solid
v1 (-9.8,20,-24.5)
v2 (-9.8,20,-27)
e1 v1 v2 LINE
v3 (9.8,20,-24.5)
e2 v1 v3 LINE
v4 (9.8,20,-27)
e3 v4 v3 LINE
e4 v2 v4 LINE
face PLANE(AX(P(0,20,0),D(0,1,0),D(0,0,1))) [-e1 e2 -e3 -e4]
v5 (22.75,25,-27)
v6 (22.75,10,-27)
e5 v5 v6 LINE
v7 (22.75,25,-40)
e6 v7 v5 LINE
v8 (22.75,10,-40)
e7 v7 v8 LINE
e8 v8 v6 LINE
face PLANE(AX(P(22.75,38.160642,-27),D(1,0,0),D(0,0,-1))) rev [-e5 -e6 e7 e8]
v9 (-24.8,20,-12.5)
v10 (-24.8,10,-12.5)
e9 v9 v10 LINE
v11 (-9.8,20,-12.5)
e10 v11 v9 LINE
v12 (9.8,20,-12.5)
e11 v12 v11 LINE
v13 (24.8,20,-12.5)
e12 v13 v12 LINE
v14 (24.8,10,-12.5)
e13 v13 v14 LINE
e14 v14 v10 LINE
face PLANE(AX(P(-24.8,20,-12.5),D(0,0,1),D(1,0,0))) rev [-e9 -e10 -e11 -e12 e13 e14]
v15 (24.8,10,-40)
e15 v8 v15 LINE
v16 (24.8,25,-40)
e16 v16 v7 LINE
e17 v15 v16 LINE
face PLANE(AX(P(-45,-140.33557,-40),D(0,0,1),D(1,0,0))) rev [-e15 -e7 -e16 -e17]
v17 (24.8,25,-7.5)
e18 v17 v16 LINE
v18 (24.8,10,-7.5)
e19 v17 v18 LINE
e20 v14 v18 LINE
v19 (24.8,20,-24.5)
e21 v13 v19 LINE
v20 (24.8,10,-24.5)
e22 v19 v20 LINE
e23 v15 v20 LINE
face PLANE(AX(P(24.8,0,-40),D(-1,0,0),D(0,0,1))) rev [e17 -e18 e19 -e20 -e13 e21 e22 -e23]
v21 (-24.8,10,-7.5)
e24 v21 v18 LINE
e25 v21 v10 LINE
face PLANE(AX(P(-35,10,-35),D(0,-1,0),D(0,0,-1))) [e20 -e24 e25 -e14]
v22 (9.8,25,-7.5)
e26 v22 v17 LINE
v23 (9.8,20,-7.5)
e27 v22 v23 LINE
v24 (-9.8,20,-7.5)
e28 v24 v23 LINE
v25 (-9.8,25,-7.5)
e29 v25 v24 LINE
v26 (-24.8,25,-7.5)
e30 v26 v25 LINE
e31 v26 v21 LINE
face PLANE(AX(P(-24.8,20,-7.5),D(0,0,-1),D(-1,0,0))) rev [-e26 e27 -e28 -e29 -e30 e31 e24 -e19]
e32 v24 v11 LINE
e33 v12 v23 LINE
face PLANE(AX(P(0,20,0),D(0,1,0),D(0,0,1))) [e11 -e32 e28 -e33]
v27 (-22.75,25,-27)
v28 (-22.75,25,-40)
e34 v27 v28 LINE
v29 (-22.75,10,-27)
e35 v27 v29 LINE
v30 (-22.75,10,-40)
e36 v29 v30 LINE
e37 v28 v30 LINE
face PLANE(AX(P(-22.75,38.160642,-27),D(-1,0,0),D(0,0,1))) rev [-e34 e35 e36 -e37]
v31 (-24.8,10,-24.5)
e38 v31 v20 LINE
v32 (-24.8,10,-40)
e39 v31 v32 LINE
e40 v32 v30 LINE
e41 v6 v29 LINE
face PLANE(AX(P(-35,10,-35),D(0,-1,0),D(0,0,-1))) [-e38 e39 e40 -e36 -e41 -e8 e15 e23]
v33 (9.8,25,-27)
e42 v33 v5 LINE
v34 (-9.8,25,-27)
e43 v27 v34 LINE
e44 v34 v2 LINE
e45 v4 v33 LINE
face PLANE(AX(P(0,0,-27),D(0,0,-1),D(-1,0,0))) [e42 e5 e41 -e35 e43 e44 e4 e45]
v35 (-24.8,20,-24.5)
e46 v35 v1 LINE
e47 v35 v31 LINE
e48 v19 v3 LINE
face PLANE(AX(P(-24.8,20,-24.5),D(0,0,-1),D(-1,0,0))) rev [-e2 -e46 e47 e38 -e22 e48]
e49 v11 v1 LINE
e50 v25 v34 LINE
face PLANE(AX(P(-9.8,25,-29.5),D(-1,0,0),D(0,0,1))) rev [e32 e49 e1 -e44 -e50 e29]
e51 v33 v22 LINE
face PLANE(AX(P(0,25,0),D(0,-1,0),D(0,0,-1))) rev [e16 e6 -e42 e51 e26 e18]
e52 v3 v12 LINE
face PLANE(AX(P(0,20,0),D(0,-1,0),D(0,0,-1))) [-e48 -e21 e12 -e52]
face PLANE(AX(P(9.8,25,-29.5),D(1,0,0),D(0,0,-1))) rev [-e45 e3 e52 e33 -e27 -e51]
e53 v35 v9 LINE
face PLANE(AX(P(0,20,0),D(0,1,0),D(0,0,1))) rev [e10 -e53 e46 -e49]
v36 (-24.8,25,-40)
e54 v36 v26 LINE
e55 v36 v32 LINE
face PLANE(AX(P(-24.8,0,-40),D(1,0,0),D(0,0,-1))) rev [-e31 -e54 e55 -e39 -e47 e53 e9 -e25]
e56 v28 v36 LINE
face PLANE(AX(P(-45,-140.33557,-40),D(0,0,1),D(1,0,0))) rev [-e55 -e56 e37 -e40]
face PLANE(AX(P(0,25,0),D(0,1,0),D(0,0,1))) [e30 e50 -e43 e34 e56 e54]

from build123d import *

# Parameters (mm, degrees)
BOSS_EXTRUDE1_DEPTH     = 10
SKETCH2_W               = 17.2
SKETCH2_H               = 43
CUT_EXTRUDE1_DEPTH      = 72.414284285
SKETCH3_W               = 90
SKETCH3_H               = 34
SKETCH3_W_2             = 80
SKETCH3_H_2             = 24
BOSS_EXTRUDE3_DEPTH     = 15
SKETCH4_W               = 49.6
SKETCH4_H               = 5
BOSS_EXTRUDE4_DEPTH     = 10
SKETCH5_W               = 15
SKETCH5_H               = 22
BOSS_EXTRUDE5_DEPTH     = 5
SKETCH6_W               = 90
SKETCH6_H               = 77
BOSS_EXTRUDE6_DEPTH     = 15
BOSS_EXTRUDE8_DEPTH     = 39
CHAMFER1_SIZE           = 64
CHAMFER1_SIZE_2         = 3.354097874
CHAMFER2_SIZE           = 64
CHAMFER2_SIZE_2         = 11.405813635
CHAMFER3_SIZE           = 64
CHAMFER3_SIZE_2         = 13.775745352
CUT_EXTRUDE3_DEPTH      = 95.500525601
CUT_EXTRUDE3_DEPTH_BACK = 95.500525601
SKETCH10_W              = 50
SKETCH10_H              = 27
SKETCH15_R              = 8
CUT_EXTRUDE5_DEPTH      = 122.227059686
CUT_EXTRUDE6_DEPTH      = 2.5
SKETCH18_W              = 29.6
SKETCH18_H              = 43
CUT_EXTRUDE7_DEPTH      = 10
CUT_EXTRUDE8_DEPTH      = 15
SKETCH21_W              = 29.6
SKETCH21_H              = 33
BOSS_EXTRUDE10_DEPTH    = 2.5
SKETCH23_W              = 2.05
SKETCH23_H              = 13
BOSS_EXTRUDE11_DEPTH    = 15
SKETCH24_OUTSIDE_W      = 133.046
SKETCH24_OUTSIDE_H      = 133.046
SKETCH24_OUTSIDE_W_2    = 90
SKETCH24_OUTSIDE_H_2    = 72
CUT_EXTRUDE10_DEPTH     = 61.5
SKETCH26_W              = 100
SKETCH26_H              = 100
CUT_EXTRUDE13_DEPTH     = 10


with BuildPart() as part:
    # Sketch1 → Boss-Extrude1 (new body)
    with BuildSketch(Plane(origin=(0, 0, 0), x_dir=(1, 0, 0), z_dir=(0, 1, 0))):
        with BuildLine():
            Line((-35, 50), (35, 50))
            ThreePointArc((35, 50), (45.606601718, 45.606601718), (50, 35))
            Line((50, 35), (50, -35))
            ThreePointArc((50, -35), (45.606601718, -45.606601718), (35, -50))
            Line((35, -50), (-35, -50))
            ThreePointArc((-35, -50), (-45.606601718, -45.606601718), (-50, -35))
            Line((-50, -35), (-50, 35))
            ThreePointArc((-50, 35), (-45.606601718, 45.606601718), (-35, 50))
        make_face()
    extrude(amount=BOSS_EXTRUDE1_DEPTH)

    # Sketch2 → Cut-Extrude1 (cut, through all)
    with BuildSketch(Plane(origin=(0, 10, 0), x_dir=(1, 0, 0), z_dir=(0, 1, 0))):
        with Locations((-33.4, 18.5)):
            Rectangle(SKETCH2_W, SKETCH2_H)
        with Locations((33.4, 18.5)):
            Rectangle(SKETCH2_W, SKETCH2_H)
    extrude(amount=-CUT_EXTRUDE1_DEPTH, mode=Mode.SUBTRACT)

    # Sketch3 → Boss-Extrude3 (add)
    with BuildSketch(Plane(origin=(0, 10, 0), x_dir=(1, 0, 0), z_dir=(0, 1, 0))):
        with Locations((0, -20)):
            Rectangle(SKETCH3_W, SKETCH3_H)
        with Locations((0, -20)):
            Rectangle(SKETCH3_W_2, SKETCH3_H_2, mode=Mode.SUBTRACT)
    extrude(amount=BOSS_EXTRUDE3_DEPTH)

    # Sketch4 → Boss-Extrude4 (add)
    with BuildSketch(Plane(origin=(0, 10, 0), x_dir=(1, 0, 0), z_dir=(0, 1, 0))):
        with Locations((0, 10)):
            Rectangle(SKETCH4_W, SKETCH4_H)
        with Locations((0, 27)):
            Rectangle(SKETCH4_W, SKETCH4_H)
    extrude(amount=BOSS_EXTRUDE4_DEPTH)

    # Sketch5 → Boss-Extrude5 (add)
    with BuildSketch(Plane(origin=(0, 20, 0), x_dir=(1, 0, 0), z_dir=(0, 1, 0))):
        with Locations((-17.3, 18.5)):
            Rectangle(SKETCH5_W, SKETCH5_H)
        with Locations((17.3, 18.5)):
            Rectangle(SKETCH5_W, SKETCH5_H)
    extrude(amount=BOSS_EXTRUDE5_DEPTH)

    # Sketch6 → Boss-Extrude6 (add)
    with BuildSketch(Plane(origin=(0, 10, 0), x_dir=(1, 0, 0), z_dir=(0, 1, 0))):
        with BuildLine():
            Line((-50, 35), (-50, -35))
            ThreePointArc((-50, -35), (-45.606601718, -45.606601718), (-35, -50))
            Line((-35, -50), (35, -50))
            ThreePointArc((35, -50), (45.606601718, -45.606601718), (50, -35))
            Line((50, -35), (50, 35))
            ThreePointArc((50, 35), (45.606601718, 45.606601718), (35, 50))
            Line((35, 50), (-35, 50))
            ThreePointArc((-35, 50), (-45.606601718, 45.606601718), (-50, 35))
        make_face()
        with Locations((0, 1.5)):
            Rectangle(SKETCH6_W, SKETCH6_H, mode=Mode.SUBTRACT)
    extrude(amount=BOSS_EXTRUDE6_DEPTH)

    # Sketch9 → Boss-Extrude8 (add)
    with BuildSketch(Plane(origin=(0, 25, 0), x_dir=(1, 0, 0), z_dir=(0, 1, 0))):
        with BuildLine():
            Line((-50, 35), (-50, -35))
            ThreePointArc((-50, -35), (-45.606601718, -45.606601718), (-35, -50))
            Line((-35, -50), (35, -50))
            ThreePointArc((35, -50), (45.606601718, -45.606601718), (50, -35))
            Line((50, -35), (50, 35))
            ThreePointArc((50, 35), (45.606601718, 45.606601718), (35, 50))
            Line((35, 50), (-35, 50))
            ThreePointArc((-35, 50), (-45.606601718, 45.606601718), (-50, 35))
        make_face()
        with BuildLine():
            Line((-45, 35), (-45, -32))
            Line((-45, -32), (45, -32))
            Line((45, -32), (45, 35))
            ThreePointArc((45, 35), (44.659258263, 37.588190451), (43.660254038, 40))
            Line((43.660254038, 40), (-43.660254038, 40))
            ThreePointArc((-43.660254038, 40), (-44.659258263, 37.588190451), (-45, 35))
        make_face(mode=Mode.SUBTRACT)
    extrude(amount=BOSS_EXTRUDE8_DEPTH)

    # Chamfer1
    # the kernel refuses this chamfer: 64, 3.354097874 mm, written as the material it takes off along each edge
    with BuildSketch(Plane(origin=(-35, 64, 50), x_dir=(0, -0.9999979738662979, 0.002013023422382214), z_dir=(1, 0, 0)), Plane(origin=(50, 64, 35), x_dir=(0.002013023422382214, -0.9999979738662979, 0), z_dir=(0, 0, -1)), Plane(origin=(-50, 64, -35), x_dir=(-0.002013023422382214, -0.9999979738662979, 0), z_dir=(0, 0, 1)), Plane(origin=(35, 64, -50), x_dir=(0, -0.9999979738662979, -0.002013023422382214), z_dir=(-1, 0, 0))) as chamfer1_piece_1:
        Polygon((CHAMFER1_SIZE * 0.999997973866, CHAMFER1_SIZE * 0.00201302342238), (-CHAMFER1_SIZE_2 * 0.00201302342245, CHAMFER1_SIZE_2 * 0.9999979739), (0, 0), align=None)
    extrude(amount=70, mode=Mode.SUBTRACT)
    with BuildSketch(Plane(origin=(35, 64, 35), x_dir=(0, 0, 1), z_dir=(-1, 0, 0))) as chamfer1_piece_2:
        Polygon((15, -CHAMFER1_SIZE), (15 - CHAMFER1_SIZE_2, 0), (15, 0), align=None)
    revolve(axis=Axis((35, 64, 35), (0, 1, 0)), revolution_arc=90, mode=Mode.SUBTRACT)
    with BuildSketch(Plane(origin=(-35, 64, 35), x_dir=(-1, 0, 0), z_dir=(0, 0, -1))) as chamfer1_piece_3:
        Polygon((15, -CHAMFER1_SIZE), (15 - CHAMFER1_SIZE_2, 0), (15, 0), align=None)
    revolve(axis=Axis((-35, 64, 35), (0, 1, 0)), revolution_arc=90, mode=Mode.SUBTRACT)
    with BuildSketch(Plane(origin=(35, 64, -35), x_dir=(1, 0, 0), z_dir=(0, 0, 1))) as chamfer1_piece_4:
        Polygon((15, -CHAMFER1_SIZE), (15 - CHAMFER1_SIZE_2, 0), (15, 0), align=None)
    revolve(axis=Axis((35, 64, -35), (0, 1, 0)), revolution_arc=90, mode=Mode.SUBTRACT)
    with BuildSketch(Plane(origin=(-35, 64, -35), x_dir=(0, 0, -1), z_dir=(1, 0, 0))) as chamfer1_piece_5:
        Polygon((15 - CHAMFER1_SIZE_2, 0), (15, -CHAMFER1_SIZE), (15, 0), align=None)
    revolve(axis=Axis((-35, 64, -35), (0, 1, 0)), revolution_arc=90, mode=Mode.SUBTRACT)

    # Chamfer2
    # the kernel refuses this chamfer: 64, 11.405813635 mm, written as the material it takes off along each edge
    with BuildSketch(Plane(origin=(201.306482971, 64, -46.645902126), x_dir=(0, -0.9982575003065525, -0.05900816114499234), z_dir=(-1, 0, 0))) as chamfer2_piece_1:
        Polygon((CHAMFER2_SIZE * 0.999977671636, CHAMFER2_SIZE * 0.0066825316561), (-CHAMFER2_SIZE_2 * 0.0590081611462, CHAMFER2_SIZE_2 * 0.998257500326), (0, 0), align=None)
    extrude(amount=402.612965942, mode=Mode.SUBTRACT)

    # Chamfer3
    # the kernel refuses this chamfer: 64, 13.775745352 mm, written as the material it takes off along each edge
    with BuildSketch(Plane(origin=(-201.265469314, 64, 46.645902126), x_dir=(0, -0.9981787050157903, 0.06032638604292662), z_dir=(1, 0, 0))) as chamfer3_piece_1:
        Polygon((CHAMFER3_SIZE * 0.999967974892, CHAMFER3_SIZE * 0.00800307379952), (-CHAMFER3_SIZE_2 * 0.060326386045, CHAMFER3_SIZE_2 * 0.99817870505), (0, 0), align=None)
    extrude(amount=402.530938629, mode=Mode.SUBTRACT)

    # Sketch10 → Cut-Extrude3 (cut, two sides: drawn at the far end of the back side and taken through both)
    with BuildSketch(Plane(origin=(0, 1.307501734, 0), x_dir=(0, 0, 1), z_dir=(-1, 0, 0)).offset(-CUT_EXTRUDE3_DEPTH_BACK)):
        with Locations((-22.129843227, 49.192498266)):
            Rectangle(SKETCH10_W, SKETCH10_H)
    extrude(amount=CUT_EXTRUDE3_DEPTH + CUT_EXTRUDE3_DEPTH_BACK, mode=Mode.SUBTRACT)

    # Sketch15 → Cut-Extrude5 (cut, through all)
    with BuildSketch(Plane.XY.offset(-40)):
        with Locations((-12.75, 20.25)):
            Circle(SKETCH15_R)
        with Locations((12.75, 20.25)):
            Circle(SKETCH15_R)
    extrude(amount=-CUT_EXTRUDE5_DEPTH, mode=Mode.SUBTRACT)

    # Sketch17 → Cut-Extrude6 (cut)
    with BuildSketch(Plane(origin=(0, 0, -29.5), x_dir=(-1, 0, 0), z_dir=(0, 0, -1))):
        Polygon((-24.8, 10), (24.8, 10), (24.8, 25), (9.8, 25), (9.8, 20), (-9.8, 20), (-9.8, 25), (-24.8, 25), align=None)
    extrude(amount=-CUT_EXTRUDE6_DEPTH, mode=Mode.SUBTRACT)

    # Sketch18 → Cut-Extrude7 (cut)
    with BuildSketch(Plane.XZ):
        with Locations((0, -18.5)):
            Rectangle(SKETCH18_W, SKETCH18_H)
    extrude(amount=-CUT_EXTRUDE7_DEPTH, mode=Mode.SUBTRACT)

    # Sketch20 → Cut-Extrude8 (cut)
    with BuildSketch(Plane.XZ.offset(-25)):
        with BuildLine():
            Line((-45, -35), (-45, -40))
            Line((-45, -40), (-43.660254038, -40))
            ThreePointArc((-43.660254038, -40), (-44.659258263, -37.588190451), (-45, -35))
        make_face()
        with BuildLine():
            Line((45, -40), (45, -35))
            ThreePointArc((45, -35), (44.659258263, -37.588190451), (43.660254038, -40))
            Line((43.660254038, -40), (45, -40))
        make_face()
    extrude(amount=-CUT_EXTRUDE8_DEPTH, mode=Mode.SUBTRACT)

    # Sketch21 → Boss-Extrude10 (add)
    with BuildSketch(Plane.XZ):
        with Locations((0, -13.5)):
            Rectangle(SKETCH21_W, SKETCH21_H)
    extrude(amount=-BOSS_EXTRUDE10_DEPTH)

    # Sketch23 → Boss-Extrude11 (add)
    with BuildSketch(Plane(origin=(0, 10, 0), x_dir=(1, 0, 0), z_dir=(0, 1, 0))):
        with Locations((-23.775, 33.5)):
            Rectangle(SKETCH23_W, SKETCH23_H)
        with Locations((23.775, 33.5)):
            Rectangle(SKETCH23_W, SKETCH23_H)
    extrude(amount=BOSS_EXTRUDE11_DEPTH)

    # Sketch24 outside → Cut-Extrude10 (cut)
    with BuildSketch(Plane(origin=(0, 64, 0), x_dir=(1, 0, 0), z_dir=(0, 1, 0))):
        Rectangle(SKETCH24_OUTSIDE_W, SKETCH24_OUTSIDE_H)
        with Locations((0, 4)):
            Rectangle(SKETCH24_OUTSIDE_W_2, SKETCH24_OUTSIDE_H_2, mode=Mode.SUBTRACT)
    extrude(amount=-CUT_EXTRUDE10_DEPTH, mode=Mode.SUBTRACT)

    # Sketch26 → Cut-Extrude13 (cut)
    with BuildSketch(Plane.XZ):
        Rectangle(SKETCH26_W, SKETCH26_H)
    extrude(amount=-CUT_EXTRUDE13_DEPTH, mode=Mode.SUBTRACT)


with BuildPart() as body_2:
    # of the pieces the cut leaves, the one that is kept (cut_extrude13_keep)
    add(part.part.solids().sort_by_distance((24.8, 25, -7.5))[0])


solid = body_2.part
